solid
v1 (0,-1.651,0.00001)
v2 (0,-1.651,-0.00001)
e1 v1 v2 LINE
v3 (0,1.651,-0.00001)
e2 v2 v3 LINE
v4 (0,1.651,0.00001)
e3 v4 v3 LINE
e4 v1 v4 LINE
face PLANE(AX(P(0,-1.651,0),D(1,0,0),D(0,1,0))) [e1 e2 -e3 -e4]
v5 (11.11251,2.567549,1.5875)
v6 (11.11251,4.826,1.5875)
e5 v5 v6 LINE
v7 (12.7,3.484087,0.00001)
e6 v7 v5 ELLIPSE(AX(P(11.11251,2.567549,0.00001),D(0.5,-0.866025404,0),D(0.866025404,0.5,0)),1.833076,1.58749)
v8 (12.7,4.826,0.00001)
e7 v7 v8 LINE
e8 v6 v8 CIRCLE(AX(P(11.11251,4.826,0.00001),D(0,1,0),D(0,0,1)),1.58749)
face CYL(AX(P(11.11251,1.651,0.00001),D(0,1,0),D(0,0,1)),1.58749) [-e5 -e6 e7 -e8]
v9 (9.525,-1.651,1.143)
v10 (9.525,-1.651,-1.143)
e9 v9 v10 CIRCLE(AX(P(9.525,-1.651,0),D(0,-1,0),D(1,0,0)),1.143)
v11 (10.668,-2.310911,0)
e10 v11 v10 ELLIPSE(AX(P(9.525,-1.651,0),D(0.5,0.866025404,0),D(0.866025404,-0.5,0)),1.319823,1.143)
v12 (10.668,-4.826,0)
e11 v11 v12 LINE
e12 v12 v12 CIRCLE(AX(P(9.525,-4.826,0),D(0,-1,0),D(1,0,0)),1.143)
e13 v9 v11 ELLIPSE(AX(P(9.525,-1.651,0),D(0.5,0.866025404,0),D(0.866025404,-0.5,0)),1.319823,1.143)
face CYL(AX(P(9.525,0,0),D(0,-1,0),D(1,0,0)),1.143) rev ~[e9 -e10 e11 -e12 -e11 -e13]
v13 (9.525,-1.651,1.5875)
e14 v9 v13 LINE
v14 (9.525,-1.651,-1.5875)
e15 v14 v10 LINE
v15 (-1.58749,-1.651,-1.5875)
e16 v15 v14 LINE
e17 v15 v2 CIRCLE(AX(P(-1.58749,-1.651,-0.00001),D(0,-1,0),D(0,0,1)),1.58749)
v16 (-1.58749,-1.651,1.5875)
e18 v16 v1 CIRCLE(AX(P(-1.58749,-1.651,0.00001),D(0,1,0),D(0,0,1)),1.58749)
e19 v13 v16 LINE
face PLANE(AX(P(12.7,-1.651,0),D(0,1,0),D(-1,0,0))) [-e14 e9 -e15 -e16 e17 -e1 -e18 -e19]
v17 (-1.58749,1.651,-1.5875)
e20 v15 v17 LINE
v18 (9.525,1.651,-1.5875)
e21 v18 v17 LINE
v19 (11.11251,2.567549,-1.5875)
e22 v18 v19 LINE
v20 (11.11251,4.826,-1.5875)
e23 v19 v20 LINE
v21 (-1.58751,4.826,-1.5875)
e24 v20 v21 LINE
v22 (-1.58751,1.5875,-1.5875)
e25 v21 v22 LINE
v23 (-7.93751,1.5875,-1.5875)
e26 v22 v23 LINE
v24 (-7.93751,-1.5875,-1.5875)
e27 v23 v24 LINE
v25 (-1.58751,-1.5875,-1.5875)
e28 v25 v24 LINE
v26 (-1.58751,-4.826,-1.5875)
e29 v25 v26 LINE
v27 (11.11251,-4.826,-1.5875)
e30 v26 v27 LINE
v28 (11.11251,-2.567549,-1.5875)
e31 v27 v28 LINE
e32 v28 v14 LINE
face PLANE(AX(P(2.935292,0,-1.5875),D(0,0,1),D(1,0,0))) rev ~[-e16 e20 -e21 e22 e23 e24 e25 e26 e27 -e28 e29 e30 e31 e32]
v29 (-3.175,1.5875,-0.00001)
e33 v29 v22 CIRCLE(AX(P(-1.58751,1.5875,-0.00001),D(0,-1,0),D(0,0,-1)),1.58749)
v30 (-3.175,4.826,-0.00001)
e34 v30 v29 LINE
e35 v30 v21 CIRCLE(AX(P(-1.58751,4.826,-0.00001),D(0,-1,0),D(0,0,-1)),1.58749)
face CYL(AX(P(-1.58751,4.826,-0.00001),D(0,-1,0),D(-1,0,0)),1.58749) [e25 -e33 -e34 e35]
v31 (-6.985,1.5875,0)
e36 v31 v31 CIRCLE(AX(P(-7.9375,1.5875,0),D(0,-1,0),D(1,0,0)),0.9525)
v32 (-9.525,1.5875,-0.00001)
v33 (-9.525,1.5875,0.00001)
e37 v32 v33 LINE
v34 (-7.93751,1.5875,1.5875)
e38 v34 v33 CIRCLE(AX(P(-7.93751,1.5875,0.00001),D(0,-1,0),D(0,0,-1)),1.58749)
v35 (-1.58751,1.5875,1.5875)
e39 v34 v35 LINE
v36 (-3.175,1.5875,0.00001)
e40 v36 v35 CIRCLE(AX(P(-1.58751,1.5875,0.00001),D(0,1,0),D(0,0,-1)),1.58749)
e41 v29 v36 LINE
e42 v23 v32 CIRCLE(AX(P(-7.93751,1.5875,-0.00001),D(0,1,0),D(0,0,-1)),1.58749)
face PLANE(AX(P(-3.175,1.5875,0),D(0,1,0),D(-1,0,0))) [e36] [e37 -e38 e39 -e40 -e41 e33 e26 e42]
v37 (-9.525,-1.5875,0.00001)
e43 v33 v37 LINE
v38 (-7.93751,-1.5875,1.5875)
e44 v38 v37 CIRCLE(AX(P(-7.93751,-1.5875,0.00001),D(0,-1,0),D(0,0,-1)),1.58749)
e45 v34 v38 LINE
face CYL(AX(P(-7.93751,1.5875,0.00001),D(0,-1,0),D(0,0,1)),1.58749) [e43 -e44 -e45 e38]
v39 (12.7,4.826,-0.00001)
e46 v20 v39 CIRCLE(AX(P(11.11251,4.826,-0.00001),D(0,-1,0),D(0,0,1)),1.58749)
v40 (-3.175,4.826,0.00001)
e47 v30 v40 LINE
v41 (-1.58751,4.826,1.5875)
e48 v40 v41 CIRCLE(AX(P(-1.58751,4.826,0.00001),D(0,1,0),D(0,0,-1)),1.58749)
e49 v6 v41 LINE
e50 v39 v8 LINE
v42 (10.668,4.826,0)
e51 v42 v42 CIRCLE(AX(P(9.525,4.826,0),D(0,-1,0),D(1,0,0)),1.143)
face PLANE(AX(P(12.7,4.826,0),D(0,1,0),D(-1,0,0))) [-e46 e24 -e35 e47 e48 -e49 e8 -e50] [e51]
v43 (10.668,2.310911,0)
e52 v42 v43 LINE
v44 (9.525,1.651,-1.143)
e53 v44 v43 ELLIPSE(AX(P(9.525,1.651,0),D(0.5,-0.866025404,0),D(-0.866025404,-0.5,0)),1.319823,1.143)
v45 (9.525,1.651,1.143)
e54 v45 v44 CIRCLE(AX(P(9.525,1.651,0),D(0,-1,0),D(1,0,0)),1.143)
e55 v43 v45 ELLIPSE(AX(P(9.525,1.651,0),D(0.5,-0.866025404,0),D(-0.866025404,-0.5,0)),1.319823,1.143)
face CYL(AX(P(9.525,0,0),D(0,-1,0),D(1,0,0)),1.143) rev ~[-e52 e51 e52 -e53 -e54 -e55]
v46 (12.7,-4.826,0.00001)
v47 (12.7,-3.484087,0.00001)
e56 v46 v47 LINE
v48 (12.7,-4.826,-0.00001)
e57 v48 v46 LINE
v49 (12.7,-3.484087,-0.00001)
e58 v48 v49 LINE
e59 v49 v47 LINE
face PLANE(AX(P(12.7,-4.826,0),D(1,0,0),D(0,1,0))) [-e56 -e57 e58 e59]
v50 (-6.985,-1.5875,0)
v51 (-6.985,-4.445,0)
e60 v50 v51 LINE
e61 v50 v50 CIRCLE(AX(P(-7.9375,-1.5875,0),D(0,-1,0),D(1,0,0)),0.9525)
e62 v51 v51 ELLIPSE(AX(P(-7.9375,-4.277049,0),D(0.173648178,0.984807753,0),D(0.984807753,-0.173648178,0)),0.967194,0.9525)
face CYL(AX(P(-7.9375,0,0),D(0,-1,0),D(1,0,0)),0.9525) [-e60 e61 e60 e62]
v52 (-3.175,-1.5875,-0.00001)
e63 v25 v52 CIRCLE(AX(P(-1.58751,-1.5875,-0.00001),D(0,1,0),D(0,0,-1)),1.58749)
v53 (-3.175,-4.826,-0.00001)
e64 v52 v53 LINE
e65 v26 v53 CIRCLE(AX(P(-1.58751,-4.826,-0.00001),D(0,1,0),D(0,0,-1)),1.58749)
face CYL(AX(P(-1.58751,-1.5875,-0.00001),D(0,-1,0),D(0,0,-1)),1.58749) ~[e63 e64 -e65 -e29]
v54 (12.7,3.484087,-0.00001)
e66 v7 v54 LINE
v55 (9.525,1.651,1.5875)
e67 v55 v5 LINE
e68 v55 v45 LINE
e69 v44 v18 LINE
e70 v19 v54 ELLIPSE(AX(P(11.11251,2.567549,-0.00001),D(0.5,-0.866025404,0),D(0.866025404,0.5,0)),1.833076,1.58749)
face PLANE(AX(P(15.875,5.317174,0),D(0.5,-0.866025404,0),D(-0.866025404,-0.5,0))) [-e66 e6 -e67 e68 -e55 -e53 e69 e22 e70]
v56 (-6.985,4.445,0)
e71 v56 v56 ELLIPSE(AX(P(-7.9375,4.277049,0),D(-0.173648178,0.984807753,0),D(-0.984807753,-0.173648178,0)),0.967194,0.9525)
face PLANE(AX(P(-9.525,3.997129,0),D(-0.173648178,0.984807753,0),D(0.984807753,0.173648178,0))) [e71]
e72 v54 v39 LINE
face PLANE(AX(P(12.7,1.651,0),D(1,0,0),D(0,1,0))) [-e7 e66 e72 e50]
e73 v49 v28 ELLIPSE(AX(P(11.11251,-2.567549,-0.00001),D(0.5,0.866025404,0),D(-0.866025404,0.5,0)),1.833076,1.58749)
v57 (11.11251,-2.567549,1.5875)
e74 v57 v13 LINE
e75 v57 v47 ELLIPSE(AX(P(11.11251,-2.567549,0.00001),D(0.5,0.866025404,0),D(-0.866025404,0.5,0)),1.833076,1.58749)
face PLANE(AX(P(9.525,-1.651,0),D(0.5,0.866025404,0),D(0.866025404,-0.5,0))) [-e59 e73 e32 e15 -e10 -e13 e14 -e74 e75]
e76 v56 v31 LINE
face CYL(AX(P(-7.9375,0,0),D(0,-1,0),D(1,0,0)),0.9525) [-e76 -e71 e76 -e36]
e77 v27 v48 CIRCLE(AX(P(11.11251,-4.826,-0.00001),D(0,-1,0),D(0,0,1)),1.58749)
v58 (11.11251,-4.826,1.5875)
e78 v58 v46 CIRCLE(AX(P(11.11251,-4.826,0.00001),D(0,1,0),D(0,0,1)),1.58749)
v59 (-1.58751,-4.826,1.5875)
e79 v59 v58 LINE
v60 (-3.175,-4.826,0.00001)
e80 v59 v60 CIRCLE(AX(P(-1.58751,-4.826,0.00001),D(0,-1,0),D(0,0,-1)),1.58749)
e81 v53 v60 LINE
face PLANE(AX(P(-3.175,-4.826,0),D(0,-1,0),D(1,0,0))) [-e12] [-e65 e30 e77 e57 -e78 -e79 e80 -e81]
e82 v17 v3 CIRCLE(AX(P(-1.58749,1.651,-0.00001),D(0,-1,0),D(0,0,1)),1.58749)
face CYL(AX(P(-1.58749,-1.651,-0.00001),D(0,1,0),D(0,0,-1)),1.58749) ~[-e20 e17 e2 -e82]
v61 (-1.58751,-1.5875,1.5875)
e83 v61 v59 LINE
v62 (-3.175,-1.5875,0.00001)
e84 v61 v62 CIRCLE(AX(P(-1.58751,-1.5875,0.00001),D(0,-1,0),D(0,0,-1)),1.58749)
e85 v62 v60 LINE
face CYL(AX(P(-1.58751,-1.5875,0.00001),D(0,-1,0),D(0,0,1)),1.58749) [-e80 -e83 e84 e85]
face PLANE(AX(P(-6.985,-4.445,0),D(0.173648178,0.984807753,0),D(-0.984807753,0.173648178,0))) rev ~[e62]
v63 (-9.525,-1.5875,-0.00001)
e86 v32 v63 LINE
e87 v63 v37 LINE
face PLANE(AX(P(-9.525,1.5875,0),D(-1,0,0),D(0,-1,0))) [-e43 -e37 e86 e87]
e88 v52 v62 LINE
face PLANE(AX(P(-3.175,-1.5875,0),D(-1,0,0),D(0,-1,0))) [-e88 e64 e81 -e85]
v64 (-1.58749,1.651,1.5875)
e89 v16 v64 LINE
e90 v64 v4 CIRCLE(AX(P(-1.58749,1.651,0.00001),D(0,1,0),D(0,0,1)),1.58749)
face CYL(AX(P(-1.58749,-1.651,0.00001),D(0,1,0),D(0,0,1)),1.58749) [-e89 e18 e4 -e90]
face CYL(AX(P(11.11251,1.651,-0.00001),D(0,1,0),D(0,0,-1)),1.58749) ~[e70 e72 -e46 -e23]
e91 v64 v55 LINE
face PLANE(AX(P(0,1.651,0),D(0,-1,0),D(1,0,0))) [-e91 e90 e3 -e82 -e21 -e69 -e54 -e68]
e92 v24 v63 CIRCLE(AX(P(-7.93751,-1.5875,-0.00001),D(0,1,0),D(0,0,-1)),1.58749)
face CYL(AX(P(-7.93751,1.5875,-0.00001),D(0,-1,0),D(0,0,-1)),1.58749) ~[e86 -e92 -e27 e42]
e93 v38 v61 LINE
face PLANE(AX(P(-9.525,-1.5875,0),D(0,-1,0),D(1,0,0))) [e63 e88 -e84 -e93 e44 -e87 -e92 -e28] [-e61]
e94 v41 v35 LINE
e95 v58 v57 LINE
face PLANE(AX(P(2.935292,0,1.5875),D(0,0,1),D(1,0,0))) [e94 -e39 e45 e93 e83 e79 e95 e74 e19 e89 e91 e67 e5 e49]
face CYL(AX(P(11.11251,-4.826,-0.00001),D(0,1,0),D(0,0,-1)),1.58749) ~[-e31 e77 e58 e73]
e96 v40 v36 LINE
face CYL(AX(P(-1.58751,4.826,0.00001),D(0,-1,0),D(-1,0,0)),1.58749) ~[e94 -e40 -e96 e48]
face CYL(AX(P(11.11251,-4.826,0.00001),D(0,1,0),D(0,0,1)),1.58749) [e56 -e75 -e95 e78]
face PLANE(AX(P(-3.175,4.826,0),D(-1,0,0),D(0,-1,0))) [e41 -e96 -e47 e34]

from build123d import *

# Parameters (mm, degrees)
F1_DEPTH = 1.5875
F3_DEPTH = 4.445
F4_R     = 1.58749
F5_R     = 1.143
F6_DEPTH = 12.7
F8_DEPTH = 12.7


# Not quite as in the source:
# - a fillet or chamfer is up to 0.001 mm smaller than in the source, because OpenCascade refuses the exact size


with BuildPart() as f1:
    # F0 (on Top) → F1 (new body, symmetric)
    with BuildSketch(Plane.XY):
        Polygon((12.7, 1.651), (12.7, 4.826), (-3.175, 4.826), (-3.175, 1.5875), (-9.525, 1.5875), (-9.525, -1.5875), (-3.175, -1.5875), (-3.175, -4.826), (12.7, -4.826), (12.7, -1.651), (0, -1.651), (0, 0), (0, 1.651), align=None)
    extrude(amount=F1_DEPTH, both=True)

    # F2 (on Front) → F3 (join, symmetric)
    with BuildSketch(Plane.XZ):
        with BuildLine():
            ThreePointArc((-8.89, 0), (-7.9375, -0.9525), (-6.985, 0))
            ThreePointArc((-6.985, 0), (-7.9375, 0.9525), (-8.89, 0))
        make_face()
    extrude(amount=F3_DEPTH, both=True)

    # F4 (radius 1.5875 in the source; OpenCascade refuses exactly that, so slightly less here)
    f4_edges = [f1.edges().sort_by_distance(p)[0] for p in [
        (-3.175, 3.20675, -1.5875),
        (-3.175, 3.20675, 1.5875),
        (-3.175, -3.20675, 1.5875),
        (-3.175, -3.20675, -1.5875),
        (-9.525, 0, 1.5875),
        (-9.525, 0, -1.5875),
        (12.7, 3.2385, -1.5875),
        (12.7, 3.2385, 1.5875),
        (12.7, -3.2385, 1.5875),
        (12.7, -3.2385, -1.5875),
        (0, 0, 1.5875),
        (0, 0, -1.5875),
    ]]
    fillet(f4_edges, radius=F4_R)

    # F5 (on Front) → F6 (cut, symmetric)
    with BuildSketch(Plane.XZ):
        with Locations((9.525, 0)):
            Circle(F5_R)
    extrude(amount=F6_DEPTH, both=True, mode=Mode.SUBTRACT)

    # F7 (on Top) → F8 (cut, symmetric)
    with BuildSketch(Plane.XY):
        Polygon((9.525, 1.651), (9.525, -1.651), (15.875, -5.3171742094), (15.875, 5.3171742094), align=None)
        Polygon((-9.525, 4.445), (-9.525, 3.997129469), (-6.985, 4.445), align=None)
        Polygon((-9.525, -4.445), (-6.985, -4.445), (-9.525, -3.997129469), align=None)
    extrude(amount=F8_DEPTH, both=True, mode=Mode.SUBTRACT)


solid = f1.part
